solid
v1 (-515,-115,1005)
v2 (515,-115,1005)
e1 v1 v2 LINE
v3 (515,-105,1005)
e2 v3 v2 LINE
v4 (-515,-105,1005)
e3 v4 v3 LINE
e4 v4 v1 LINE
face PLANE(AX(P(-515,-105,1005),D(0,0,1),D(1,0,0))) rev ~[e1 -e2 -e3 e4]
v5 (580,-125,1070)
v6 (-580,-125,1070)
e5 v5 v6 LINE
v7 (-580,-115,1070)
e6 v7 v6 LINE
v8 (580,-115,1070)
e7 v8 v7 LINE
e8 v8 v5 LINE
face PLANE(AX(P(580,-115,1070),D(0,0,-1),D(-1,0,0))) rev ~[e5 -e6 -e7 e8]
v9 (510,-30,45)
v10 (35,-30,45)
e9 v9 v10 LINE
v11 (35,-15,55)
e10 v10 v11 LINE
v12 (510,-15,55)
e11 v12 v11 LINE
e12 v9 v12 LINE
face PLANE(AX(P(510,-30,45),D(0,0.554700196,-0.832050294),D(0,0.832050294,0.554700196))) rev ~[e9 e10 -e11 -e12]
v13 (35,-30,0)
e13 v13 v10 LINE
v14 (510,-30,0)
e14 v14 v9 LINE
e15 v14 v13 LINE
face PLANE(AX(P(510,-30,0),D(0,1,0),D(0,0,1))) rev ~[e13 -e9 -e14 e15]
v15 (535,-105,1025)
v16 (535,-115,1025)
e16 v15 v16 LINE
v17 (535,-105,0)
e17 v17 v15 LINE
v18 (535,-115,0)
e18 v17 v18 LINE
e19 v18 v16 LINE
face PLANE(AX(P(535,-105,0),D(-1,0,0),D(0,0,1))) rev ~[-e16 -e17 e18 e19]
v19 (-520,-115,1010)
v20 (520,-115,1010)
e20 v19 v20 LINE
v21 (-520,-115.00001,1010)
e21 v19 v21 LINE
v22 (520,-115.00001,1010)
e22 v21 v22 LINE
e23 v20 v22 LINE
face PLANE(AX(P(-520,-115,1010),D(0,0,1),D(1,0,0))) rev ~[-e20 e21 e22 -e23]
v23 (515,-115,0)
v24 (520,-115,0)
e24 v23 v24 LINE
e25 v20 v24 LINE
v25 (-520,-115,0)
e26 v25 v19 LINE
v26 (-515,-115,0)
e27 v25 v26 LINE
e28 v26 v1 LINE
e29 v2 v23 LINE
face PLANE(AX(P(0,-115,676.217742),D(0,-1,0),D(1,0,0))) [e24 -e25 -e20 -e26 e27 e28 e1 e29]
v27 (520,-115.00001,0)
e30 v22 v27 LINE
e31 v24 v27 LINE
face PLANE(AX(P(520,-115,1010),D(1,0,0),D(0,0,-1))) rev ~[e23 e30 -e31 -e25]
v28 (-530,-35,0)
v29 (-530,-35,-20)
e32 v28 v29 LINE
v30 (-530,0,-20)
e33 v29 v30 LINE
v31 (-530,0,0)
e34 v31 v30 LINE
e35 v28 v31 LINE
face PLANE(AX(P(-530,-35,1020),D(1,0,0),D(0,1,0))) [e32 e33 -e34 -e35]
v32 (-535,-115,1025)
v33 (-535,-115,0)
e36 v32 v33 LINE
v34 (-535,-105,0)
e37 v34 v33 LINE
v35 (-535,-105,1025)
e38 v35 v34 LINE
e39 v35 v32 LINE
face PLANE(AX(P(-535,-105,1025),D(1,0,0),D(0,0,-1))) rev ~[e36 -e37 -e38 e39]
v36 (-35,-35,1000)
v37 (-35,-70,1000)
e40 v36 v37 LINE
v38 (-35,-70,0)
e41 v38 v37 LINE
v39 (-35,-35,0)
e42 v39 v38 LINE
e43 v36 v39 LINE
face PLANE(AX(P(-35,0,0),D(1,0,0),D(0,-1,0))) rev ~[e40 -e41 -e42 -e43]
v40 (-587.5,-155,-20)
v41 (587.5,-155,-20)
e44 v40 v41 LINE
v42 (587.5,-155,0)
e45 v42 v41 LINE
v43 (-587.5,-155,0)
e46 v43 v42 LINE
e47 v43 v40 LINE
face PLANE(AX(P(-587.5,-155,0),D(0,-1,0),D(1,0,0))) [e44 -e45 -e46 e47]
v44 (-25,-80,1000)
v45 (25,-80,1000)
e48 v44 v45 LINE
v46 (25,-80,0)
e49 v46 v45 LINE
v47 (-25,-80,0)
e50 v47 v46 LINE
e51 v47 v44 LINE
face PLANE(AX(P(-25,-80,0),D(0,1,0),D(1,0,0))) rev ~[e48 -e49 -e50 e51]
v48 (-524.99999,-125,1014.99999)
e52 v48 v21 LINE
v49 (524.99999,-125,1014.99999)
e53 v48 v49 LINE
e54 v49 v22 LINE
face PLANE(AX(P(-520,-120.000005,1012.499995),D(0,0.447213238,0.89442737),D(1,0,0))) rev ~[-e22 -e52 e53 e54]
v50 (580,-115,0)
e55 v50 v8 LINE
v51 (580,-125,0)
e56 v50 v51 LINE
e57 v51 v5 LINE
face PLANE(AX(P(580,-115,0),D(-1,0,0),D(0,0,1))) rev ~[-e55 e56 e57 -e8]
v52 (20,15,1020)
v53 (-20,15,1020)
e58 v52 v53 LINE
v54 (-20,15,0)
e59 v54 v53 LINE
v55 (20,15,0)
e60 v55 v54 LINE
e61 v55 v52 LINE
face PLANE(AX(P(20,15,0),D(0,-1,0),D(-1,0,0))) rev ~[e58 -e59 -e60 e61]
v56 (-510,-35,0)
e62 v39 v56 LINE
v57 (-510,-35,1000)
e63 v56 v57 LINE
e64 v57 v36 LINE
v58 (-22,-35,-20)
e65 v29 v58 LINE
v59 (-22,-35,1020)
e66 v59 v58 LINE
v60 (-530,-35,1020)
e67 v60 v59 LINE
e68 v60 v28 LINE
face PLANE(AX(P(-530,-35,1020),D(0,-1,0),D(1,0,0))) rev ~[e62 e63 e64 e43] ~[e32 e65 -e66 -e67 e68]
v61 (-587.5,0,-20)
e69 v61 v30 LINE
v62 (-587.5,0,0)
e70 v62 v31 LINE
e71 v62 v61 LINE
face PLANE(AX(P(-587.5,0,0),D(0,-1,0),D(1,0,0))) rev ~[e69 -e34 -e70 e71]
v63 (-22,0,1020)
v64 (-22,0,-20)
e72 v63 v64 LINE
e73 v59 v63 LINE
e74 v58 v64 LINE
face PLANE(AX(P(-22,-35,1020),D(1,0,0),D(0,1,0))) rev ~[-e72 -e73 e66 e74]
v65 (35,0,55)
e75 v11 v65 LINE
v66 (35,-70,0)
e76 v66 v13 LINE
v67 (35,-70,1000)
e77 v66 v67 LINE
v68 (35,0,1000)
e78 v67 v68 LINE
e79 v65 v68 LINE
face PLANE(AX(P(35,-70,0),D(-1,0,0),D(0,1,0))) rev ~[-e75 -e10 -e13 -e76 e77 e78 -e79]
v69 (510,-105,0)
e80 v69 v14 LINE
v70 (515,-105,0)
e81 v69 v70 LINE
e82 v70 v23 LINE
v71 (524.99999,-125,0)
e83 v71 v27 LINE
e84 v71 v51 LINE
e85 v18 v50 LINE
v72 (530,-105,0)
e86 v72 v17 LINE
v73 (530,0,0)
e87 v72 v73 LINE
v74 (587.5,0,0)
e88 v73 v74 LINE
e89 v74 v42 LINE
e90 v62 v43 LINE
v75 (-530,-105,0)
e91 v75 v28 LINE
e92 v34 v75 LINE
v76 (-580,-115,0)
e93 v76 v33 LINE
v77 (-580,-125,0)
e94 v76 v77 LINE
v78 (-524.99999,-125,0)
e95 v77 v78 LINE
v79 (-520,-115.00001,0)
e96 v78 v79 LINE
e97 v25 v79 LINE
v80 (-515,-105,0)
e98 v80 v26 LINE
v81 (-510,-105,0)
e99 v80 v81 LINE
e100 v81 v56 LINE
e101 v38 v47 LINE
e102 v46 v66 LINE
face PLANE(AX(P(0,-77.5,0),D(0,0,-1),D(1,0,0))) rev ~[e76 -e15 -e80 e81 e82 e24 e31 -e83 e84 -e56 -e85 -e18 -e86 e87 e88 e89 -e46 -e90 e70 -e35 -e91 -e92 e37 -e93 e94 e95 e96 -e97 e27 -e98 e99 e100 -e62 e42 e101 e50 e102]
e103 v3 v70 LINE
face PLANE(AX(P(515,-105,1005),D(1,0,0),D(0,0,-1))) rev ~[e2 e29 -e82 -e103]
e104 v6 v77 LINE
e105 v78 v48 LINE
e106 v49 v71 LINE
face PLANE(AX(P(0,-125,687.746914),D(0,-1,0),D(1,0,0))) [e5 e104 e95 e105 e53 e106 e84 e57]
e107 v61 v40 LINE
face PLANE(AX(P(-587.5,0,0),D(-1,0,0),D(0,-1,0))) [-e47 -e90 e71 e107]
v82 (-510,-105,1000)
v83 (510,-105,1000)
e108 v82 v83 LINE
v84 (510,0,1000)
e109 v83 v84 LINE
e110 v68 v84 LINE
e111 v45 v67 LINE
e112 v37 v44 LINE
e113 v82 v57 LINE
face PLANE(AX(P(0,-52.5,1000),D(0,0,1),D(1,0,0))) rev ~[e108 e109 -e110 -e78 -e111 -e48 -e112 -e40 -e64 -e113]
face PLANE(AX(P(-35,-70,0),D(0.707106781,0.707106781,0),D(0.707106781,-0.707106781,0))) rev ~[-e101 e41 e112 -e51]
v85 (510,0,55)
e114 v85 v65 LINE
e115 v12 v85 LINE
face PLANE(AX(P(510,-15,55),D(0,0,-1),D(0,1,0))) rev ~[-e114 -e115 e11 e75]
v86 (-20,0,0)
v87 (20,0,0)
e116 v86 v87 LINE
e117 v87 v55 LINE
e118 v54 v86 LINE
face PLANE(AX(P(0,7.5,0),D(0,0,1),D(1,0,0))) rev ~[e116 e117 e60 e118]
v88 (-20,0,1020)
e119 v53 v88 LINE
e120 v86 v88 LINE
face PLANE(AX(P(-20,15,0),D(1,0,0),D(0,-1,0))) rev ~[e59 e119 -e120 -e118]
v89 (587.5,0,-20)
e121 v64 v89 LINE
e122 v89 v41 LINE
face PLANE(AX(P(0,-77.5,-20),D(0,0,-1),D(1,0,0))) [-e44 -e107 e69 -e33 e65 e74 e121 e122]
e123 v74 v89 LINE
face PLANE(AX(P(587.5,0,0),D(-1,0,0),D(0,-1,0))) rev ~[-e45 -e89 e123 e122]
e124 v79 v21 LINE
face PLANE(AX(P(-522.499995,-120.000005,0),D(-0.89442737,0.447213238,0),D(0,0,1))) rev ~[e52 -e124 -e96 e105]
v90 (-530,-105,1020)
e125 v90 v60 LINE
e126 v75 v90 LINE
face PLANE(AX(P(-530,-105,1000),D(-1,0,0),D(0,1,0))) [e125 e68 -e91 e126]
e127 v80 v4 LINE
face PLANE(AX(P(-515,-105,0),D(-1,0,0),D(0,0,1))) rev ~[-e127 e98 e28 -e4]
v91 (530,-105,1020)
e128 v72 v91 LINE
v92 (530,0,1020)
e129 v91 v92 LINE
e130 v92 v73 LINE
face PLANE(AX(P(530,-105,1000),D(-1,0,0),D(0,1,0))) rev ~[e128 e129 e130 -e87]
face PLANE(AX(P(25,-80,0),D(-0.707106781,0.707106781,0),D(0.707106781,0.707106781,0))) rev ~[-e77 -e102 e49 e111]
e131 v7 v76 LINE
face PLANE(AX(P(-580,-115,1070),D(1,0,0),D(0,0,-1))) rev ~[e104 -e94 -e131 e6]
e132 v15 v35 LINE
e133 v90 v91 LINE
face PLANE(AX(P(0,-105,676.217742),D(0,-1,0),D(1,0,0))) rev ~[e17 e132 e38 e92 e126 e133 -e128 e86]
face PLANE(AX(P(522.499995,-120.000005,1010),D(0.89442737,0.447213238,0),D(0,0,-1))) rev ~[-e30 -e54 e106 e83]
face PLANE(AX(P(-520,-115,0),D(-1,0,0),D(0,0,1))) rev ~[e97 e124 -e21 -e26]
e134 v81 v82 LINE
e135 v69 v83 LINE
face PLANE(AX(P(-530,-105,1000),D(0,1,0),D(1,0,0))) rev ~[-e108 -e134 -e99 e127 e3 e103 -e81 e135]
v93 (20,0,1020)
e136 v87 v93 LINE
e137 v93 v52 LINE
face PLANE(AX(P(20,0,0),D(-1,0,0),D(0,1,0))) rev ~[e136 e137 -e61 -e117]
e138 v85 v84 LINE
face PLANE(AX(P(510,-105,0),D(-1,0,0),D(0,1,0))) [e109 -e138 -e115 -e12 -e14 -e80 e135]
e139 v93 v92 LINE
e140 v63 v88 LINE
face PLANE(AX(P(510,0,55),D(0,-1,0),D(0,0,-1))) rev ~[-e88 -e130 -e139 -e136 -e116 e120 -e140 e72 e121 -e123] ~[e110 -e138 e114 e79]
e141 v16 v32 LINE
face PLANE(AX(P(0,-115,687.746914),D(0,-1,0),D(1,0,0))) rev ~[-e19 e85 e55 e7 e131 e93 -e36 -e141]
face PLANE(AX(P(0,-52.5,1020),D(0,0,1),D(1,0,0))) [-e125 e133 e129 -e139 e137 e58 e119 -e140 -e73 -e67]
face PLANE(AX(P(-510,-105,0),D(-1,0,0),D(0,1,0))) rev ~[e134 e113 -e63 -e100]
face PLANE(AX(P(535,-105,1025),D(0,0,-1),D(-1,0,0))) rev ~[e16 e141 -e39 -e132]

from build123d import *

# Parameters (mm, degrees)
F0_W      = 20
F0_H      = 105
F1_DEPTH  = 1000
F2_W      = 1060
F2_H      = 105
F3_DEPTH  = 20
F4_W      = 1175
F4_H      = 155
F5_DEPTH  = 20
F7_W      = 508
F7_H      = 35
F8_DEPTH  = 1040
F9_DEPTH  = 475
F11_DEPTH = 10
F13_DEPTH = 1020
F15_DEPTH = 10
F16_SIZE2 = 9.99999
F16_SIZE  = 4.99999


# Not quite as in the source:
# - a fillet or chamfer is up to 0.001 mm smaller than in the source, because OpenCascade refuses the exact size


with BuildPart() as f1:
    # F0 (on Top) → F1 (new body)
    with BuildSketch(Plane.XY):
        with Locations((-520, -52.5)):
            Rectangle(F0_W, F0_H)
    extrude(amount=F1_DEPTH)



with BuildPart() as f1b:
    # F0 (on Top) → F1, piece 2 (new body)
    with BuildSketch(Plane.XY):
        with Locations((520, -52.5)):
            Rectangle(F0_W, F0_H)
    extrude(amount=F1_DEPTH)


with BuildPart() as f1c:
    # F0 (on Top) → F1, piece 3 (new body)
    with BuildSketch(Plane.XY):
        Polygon((35, 0), (0, 0), (-35, 0), (-35, -70), (-25, -80), (25, -80), (35, -70), align=None)
    extrude(amount=F1_DEPTH)


with BuildPart() as f1_1:
    add(f1.part)

    add(f1b.part)  # F3 merges F1b

    add(f1c.part)  # F3 merges F1c
    # F2 (on face) → F3 (join)
    with BuildSketch(Plane.XY.offset(1000)):
        with Locations((0, -52.5)):
            Rectangle(F2_W, F2_H)
    extrude(amount=F3_DEPTH)

    # F4 (on face) → F5 (join)
    with BuildSketch(Plane(origin=(0, 0, 0), x_dir=(1, 0, 0), z_dir=(0, 0, -1))):
        with Locations((0, 77.5)):
            Rectangle(F4_W, F4_H)
    extrude(amount=F5_DEPTH)

    # F7 (on face) → F8 (cut, through all)
    with BuildSketch(Plane.XY.offset(1020)):
        with Locations((-276, -17.5)):
            Rectangle(F7_W, F7_H)
    extrude(amount=-F8_DEPTH, mode=Mode.SUBTRACT)

    # F6 (on face) → F9 (join, through all)
    with BuildSketch(Plane(origin=(510, 0, 0), x_dir=(0, -1, 0), z_dir=(-1, 0, 0))):
        Polygon((0, 55), (0, 0), (30, 0), (30, 45), (15, 55), align=None)
    extrude(amount=F9_DEPTH)

    # F10 (on face) → F11 (join)
    with BuildSketch(Plane.XZ.offset(105)):
        Polygon((515, 1005), (515, 0), (535, 0), (535, 1025), (-535, 1025), (-535, 0), (-515, 0), (-515, 1005), align=None)
    extrude(amount=F11_DEPTH)

    # F12 (on Top) → F13 (join, through all)
    with BuildSketch(Plane.XY):
        Polygon((-20, 0), (0, 0), (20, 0), (20, 15), (-20, 15), align=None)
    extrude(amount=F13_DEPTH)

    # F14 (on face) → F15 (join)
    with BuildSketch(Plane.XZ.offset(115)):
        Polygon((520, 1010), (520, 0), (580, 0), (580, 1070), (-580, 1070), (-580, 0), (-520, 0), (-520, 1010), align=None)
    extrude(amount=F15_DEPTH)

    # F16 (size 5 and 10 in the source; OpenCascade refuses exactly that, so slightly less here)
    f16_edges = [f1_1.edges().sort_by_distance(p)[0] for p in [
        (-520, -125, 505),
        (0, -125, 1010),
        (520, -125, 505),
    ]]
    f16_side = f1_1.faces().sort_by_distance((535.781318, -125, 505))[0]
    chamfer(f16_edges, length=F16_SIZE, length2=F16_SIZE2, reference=f16_side)


solid = f1_1.part
